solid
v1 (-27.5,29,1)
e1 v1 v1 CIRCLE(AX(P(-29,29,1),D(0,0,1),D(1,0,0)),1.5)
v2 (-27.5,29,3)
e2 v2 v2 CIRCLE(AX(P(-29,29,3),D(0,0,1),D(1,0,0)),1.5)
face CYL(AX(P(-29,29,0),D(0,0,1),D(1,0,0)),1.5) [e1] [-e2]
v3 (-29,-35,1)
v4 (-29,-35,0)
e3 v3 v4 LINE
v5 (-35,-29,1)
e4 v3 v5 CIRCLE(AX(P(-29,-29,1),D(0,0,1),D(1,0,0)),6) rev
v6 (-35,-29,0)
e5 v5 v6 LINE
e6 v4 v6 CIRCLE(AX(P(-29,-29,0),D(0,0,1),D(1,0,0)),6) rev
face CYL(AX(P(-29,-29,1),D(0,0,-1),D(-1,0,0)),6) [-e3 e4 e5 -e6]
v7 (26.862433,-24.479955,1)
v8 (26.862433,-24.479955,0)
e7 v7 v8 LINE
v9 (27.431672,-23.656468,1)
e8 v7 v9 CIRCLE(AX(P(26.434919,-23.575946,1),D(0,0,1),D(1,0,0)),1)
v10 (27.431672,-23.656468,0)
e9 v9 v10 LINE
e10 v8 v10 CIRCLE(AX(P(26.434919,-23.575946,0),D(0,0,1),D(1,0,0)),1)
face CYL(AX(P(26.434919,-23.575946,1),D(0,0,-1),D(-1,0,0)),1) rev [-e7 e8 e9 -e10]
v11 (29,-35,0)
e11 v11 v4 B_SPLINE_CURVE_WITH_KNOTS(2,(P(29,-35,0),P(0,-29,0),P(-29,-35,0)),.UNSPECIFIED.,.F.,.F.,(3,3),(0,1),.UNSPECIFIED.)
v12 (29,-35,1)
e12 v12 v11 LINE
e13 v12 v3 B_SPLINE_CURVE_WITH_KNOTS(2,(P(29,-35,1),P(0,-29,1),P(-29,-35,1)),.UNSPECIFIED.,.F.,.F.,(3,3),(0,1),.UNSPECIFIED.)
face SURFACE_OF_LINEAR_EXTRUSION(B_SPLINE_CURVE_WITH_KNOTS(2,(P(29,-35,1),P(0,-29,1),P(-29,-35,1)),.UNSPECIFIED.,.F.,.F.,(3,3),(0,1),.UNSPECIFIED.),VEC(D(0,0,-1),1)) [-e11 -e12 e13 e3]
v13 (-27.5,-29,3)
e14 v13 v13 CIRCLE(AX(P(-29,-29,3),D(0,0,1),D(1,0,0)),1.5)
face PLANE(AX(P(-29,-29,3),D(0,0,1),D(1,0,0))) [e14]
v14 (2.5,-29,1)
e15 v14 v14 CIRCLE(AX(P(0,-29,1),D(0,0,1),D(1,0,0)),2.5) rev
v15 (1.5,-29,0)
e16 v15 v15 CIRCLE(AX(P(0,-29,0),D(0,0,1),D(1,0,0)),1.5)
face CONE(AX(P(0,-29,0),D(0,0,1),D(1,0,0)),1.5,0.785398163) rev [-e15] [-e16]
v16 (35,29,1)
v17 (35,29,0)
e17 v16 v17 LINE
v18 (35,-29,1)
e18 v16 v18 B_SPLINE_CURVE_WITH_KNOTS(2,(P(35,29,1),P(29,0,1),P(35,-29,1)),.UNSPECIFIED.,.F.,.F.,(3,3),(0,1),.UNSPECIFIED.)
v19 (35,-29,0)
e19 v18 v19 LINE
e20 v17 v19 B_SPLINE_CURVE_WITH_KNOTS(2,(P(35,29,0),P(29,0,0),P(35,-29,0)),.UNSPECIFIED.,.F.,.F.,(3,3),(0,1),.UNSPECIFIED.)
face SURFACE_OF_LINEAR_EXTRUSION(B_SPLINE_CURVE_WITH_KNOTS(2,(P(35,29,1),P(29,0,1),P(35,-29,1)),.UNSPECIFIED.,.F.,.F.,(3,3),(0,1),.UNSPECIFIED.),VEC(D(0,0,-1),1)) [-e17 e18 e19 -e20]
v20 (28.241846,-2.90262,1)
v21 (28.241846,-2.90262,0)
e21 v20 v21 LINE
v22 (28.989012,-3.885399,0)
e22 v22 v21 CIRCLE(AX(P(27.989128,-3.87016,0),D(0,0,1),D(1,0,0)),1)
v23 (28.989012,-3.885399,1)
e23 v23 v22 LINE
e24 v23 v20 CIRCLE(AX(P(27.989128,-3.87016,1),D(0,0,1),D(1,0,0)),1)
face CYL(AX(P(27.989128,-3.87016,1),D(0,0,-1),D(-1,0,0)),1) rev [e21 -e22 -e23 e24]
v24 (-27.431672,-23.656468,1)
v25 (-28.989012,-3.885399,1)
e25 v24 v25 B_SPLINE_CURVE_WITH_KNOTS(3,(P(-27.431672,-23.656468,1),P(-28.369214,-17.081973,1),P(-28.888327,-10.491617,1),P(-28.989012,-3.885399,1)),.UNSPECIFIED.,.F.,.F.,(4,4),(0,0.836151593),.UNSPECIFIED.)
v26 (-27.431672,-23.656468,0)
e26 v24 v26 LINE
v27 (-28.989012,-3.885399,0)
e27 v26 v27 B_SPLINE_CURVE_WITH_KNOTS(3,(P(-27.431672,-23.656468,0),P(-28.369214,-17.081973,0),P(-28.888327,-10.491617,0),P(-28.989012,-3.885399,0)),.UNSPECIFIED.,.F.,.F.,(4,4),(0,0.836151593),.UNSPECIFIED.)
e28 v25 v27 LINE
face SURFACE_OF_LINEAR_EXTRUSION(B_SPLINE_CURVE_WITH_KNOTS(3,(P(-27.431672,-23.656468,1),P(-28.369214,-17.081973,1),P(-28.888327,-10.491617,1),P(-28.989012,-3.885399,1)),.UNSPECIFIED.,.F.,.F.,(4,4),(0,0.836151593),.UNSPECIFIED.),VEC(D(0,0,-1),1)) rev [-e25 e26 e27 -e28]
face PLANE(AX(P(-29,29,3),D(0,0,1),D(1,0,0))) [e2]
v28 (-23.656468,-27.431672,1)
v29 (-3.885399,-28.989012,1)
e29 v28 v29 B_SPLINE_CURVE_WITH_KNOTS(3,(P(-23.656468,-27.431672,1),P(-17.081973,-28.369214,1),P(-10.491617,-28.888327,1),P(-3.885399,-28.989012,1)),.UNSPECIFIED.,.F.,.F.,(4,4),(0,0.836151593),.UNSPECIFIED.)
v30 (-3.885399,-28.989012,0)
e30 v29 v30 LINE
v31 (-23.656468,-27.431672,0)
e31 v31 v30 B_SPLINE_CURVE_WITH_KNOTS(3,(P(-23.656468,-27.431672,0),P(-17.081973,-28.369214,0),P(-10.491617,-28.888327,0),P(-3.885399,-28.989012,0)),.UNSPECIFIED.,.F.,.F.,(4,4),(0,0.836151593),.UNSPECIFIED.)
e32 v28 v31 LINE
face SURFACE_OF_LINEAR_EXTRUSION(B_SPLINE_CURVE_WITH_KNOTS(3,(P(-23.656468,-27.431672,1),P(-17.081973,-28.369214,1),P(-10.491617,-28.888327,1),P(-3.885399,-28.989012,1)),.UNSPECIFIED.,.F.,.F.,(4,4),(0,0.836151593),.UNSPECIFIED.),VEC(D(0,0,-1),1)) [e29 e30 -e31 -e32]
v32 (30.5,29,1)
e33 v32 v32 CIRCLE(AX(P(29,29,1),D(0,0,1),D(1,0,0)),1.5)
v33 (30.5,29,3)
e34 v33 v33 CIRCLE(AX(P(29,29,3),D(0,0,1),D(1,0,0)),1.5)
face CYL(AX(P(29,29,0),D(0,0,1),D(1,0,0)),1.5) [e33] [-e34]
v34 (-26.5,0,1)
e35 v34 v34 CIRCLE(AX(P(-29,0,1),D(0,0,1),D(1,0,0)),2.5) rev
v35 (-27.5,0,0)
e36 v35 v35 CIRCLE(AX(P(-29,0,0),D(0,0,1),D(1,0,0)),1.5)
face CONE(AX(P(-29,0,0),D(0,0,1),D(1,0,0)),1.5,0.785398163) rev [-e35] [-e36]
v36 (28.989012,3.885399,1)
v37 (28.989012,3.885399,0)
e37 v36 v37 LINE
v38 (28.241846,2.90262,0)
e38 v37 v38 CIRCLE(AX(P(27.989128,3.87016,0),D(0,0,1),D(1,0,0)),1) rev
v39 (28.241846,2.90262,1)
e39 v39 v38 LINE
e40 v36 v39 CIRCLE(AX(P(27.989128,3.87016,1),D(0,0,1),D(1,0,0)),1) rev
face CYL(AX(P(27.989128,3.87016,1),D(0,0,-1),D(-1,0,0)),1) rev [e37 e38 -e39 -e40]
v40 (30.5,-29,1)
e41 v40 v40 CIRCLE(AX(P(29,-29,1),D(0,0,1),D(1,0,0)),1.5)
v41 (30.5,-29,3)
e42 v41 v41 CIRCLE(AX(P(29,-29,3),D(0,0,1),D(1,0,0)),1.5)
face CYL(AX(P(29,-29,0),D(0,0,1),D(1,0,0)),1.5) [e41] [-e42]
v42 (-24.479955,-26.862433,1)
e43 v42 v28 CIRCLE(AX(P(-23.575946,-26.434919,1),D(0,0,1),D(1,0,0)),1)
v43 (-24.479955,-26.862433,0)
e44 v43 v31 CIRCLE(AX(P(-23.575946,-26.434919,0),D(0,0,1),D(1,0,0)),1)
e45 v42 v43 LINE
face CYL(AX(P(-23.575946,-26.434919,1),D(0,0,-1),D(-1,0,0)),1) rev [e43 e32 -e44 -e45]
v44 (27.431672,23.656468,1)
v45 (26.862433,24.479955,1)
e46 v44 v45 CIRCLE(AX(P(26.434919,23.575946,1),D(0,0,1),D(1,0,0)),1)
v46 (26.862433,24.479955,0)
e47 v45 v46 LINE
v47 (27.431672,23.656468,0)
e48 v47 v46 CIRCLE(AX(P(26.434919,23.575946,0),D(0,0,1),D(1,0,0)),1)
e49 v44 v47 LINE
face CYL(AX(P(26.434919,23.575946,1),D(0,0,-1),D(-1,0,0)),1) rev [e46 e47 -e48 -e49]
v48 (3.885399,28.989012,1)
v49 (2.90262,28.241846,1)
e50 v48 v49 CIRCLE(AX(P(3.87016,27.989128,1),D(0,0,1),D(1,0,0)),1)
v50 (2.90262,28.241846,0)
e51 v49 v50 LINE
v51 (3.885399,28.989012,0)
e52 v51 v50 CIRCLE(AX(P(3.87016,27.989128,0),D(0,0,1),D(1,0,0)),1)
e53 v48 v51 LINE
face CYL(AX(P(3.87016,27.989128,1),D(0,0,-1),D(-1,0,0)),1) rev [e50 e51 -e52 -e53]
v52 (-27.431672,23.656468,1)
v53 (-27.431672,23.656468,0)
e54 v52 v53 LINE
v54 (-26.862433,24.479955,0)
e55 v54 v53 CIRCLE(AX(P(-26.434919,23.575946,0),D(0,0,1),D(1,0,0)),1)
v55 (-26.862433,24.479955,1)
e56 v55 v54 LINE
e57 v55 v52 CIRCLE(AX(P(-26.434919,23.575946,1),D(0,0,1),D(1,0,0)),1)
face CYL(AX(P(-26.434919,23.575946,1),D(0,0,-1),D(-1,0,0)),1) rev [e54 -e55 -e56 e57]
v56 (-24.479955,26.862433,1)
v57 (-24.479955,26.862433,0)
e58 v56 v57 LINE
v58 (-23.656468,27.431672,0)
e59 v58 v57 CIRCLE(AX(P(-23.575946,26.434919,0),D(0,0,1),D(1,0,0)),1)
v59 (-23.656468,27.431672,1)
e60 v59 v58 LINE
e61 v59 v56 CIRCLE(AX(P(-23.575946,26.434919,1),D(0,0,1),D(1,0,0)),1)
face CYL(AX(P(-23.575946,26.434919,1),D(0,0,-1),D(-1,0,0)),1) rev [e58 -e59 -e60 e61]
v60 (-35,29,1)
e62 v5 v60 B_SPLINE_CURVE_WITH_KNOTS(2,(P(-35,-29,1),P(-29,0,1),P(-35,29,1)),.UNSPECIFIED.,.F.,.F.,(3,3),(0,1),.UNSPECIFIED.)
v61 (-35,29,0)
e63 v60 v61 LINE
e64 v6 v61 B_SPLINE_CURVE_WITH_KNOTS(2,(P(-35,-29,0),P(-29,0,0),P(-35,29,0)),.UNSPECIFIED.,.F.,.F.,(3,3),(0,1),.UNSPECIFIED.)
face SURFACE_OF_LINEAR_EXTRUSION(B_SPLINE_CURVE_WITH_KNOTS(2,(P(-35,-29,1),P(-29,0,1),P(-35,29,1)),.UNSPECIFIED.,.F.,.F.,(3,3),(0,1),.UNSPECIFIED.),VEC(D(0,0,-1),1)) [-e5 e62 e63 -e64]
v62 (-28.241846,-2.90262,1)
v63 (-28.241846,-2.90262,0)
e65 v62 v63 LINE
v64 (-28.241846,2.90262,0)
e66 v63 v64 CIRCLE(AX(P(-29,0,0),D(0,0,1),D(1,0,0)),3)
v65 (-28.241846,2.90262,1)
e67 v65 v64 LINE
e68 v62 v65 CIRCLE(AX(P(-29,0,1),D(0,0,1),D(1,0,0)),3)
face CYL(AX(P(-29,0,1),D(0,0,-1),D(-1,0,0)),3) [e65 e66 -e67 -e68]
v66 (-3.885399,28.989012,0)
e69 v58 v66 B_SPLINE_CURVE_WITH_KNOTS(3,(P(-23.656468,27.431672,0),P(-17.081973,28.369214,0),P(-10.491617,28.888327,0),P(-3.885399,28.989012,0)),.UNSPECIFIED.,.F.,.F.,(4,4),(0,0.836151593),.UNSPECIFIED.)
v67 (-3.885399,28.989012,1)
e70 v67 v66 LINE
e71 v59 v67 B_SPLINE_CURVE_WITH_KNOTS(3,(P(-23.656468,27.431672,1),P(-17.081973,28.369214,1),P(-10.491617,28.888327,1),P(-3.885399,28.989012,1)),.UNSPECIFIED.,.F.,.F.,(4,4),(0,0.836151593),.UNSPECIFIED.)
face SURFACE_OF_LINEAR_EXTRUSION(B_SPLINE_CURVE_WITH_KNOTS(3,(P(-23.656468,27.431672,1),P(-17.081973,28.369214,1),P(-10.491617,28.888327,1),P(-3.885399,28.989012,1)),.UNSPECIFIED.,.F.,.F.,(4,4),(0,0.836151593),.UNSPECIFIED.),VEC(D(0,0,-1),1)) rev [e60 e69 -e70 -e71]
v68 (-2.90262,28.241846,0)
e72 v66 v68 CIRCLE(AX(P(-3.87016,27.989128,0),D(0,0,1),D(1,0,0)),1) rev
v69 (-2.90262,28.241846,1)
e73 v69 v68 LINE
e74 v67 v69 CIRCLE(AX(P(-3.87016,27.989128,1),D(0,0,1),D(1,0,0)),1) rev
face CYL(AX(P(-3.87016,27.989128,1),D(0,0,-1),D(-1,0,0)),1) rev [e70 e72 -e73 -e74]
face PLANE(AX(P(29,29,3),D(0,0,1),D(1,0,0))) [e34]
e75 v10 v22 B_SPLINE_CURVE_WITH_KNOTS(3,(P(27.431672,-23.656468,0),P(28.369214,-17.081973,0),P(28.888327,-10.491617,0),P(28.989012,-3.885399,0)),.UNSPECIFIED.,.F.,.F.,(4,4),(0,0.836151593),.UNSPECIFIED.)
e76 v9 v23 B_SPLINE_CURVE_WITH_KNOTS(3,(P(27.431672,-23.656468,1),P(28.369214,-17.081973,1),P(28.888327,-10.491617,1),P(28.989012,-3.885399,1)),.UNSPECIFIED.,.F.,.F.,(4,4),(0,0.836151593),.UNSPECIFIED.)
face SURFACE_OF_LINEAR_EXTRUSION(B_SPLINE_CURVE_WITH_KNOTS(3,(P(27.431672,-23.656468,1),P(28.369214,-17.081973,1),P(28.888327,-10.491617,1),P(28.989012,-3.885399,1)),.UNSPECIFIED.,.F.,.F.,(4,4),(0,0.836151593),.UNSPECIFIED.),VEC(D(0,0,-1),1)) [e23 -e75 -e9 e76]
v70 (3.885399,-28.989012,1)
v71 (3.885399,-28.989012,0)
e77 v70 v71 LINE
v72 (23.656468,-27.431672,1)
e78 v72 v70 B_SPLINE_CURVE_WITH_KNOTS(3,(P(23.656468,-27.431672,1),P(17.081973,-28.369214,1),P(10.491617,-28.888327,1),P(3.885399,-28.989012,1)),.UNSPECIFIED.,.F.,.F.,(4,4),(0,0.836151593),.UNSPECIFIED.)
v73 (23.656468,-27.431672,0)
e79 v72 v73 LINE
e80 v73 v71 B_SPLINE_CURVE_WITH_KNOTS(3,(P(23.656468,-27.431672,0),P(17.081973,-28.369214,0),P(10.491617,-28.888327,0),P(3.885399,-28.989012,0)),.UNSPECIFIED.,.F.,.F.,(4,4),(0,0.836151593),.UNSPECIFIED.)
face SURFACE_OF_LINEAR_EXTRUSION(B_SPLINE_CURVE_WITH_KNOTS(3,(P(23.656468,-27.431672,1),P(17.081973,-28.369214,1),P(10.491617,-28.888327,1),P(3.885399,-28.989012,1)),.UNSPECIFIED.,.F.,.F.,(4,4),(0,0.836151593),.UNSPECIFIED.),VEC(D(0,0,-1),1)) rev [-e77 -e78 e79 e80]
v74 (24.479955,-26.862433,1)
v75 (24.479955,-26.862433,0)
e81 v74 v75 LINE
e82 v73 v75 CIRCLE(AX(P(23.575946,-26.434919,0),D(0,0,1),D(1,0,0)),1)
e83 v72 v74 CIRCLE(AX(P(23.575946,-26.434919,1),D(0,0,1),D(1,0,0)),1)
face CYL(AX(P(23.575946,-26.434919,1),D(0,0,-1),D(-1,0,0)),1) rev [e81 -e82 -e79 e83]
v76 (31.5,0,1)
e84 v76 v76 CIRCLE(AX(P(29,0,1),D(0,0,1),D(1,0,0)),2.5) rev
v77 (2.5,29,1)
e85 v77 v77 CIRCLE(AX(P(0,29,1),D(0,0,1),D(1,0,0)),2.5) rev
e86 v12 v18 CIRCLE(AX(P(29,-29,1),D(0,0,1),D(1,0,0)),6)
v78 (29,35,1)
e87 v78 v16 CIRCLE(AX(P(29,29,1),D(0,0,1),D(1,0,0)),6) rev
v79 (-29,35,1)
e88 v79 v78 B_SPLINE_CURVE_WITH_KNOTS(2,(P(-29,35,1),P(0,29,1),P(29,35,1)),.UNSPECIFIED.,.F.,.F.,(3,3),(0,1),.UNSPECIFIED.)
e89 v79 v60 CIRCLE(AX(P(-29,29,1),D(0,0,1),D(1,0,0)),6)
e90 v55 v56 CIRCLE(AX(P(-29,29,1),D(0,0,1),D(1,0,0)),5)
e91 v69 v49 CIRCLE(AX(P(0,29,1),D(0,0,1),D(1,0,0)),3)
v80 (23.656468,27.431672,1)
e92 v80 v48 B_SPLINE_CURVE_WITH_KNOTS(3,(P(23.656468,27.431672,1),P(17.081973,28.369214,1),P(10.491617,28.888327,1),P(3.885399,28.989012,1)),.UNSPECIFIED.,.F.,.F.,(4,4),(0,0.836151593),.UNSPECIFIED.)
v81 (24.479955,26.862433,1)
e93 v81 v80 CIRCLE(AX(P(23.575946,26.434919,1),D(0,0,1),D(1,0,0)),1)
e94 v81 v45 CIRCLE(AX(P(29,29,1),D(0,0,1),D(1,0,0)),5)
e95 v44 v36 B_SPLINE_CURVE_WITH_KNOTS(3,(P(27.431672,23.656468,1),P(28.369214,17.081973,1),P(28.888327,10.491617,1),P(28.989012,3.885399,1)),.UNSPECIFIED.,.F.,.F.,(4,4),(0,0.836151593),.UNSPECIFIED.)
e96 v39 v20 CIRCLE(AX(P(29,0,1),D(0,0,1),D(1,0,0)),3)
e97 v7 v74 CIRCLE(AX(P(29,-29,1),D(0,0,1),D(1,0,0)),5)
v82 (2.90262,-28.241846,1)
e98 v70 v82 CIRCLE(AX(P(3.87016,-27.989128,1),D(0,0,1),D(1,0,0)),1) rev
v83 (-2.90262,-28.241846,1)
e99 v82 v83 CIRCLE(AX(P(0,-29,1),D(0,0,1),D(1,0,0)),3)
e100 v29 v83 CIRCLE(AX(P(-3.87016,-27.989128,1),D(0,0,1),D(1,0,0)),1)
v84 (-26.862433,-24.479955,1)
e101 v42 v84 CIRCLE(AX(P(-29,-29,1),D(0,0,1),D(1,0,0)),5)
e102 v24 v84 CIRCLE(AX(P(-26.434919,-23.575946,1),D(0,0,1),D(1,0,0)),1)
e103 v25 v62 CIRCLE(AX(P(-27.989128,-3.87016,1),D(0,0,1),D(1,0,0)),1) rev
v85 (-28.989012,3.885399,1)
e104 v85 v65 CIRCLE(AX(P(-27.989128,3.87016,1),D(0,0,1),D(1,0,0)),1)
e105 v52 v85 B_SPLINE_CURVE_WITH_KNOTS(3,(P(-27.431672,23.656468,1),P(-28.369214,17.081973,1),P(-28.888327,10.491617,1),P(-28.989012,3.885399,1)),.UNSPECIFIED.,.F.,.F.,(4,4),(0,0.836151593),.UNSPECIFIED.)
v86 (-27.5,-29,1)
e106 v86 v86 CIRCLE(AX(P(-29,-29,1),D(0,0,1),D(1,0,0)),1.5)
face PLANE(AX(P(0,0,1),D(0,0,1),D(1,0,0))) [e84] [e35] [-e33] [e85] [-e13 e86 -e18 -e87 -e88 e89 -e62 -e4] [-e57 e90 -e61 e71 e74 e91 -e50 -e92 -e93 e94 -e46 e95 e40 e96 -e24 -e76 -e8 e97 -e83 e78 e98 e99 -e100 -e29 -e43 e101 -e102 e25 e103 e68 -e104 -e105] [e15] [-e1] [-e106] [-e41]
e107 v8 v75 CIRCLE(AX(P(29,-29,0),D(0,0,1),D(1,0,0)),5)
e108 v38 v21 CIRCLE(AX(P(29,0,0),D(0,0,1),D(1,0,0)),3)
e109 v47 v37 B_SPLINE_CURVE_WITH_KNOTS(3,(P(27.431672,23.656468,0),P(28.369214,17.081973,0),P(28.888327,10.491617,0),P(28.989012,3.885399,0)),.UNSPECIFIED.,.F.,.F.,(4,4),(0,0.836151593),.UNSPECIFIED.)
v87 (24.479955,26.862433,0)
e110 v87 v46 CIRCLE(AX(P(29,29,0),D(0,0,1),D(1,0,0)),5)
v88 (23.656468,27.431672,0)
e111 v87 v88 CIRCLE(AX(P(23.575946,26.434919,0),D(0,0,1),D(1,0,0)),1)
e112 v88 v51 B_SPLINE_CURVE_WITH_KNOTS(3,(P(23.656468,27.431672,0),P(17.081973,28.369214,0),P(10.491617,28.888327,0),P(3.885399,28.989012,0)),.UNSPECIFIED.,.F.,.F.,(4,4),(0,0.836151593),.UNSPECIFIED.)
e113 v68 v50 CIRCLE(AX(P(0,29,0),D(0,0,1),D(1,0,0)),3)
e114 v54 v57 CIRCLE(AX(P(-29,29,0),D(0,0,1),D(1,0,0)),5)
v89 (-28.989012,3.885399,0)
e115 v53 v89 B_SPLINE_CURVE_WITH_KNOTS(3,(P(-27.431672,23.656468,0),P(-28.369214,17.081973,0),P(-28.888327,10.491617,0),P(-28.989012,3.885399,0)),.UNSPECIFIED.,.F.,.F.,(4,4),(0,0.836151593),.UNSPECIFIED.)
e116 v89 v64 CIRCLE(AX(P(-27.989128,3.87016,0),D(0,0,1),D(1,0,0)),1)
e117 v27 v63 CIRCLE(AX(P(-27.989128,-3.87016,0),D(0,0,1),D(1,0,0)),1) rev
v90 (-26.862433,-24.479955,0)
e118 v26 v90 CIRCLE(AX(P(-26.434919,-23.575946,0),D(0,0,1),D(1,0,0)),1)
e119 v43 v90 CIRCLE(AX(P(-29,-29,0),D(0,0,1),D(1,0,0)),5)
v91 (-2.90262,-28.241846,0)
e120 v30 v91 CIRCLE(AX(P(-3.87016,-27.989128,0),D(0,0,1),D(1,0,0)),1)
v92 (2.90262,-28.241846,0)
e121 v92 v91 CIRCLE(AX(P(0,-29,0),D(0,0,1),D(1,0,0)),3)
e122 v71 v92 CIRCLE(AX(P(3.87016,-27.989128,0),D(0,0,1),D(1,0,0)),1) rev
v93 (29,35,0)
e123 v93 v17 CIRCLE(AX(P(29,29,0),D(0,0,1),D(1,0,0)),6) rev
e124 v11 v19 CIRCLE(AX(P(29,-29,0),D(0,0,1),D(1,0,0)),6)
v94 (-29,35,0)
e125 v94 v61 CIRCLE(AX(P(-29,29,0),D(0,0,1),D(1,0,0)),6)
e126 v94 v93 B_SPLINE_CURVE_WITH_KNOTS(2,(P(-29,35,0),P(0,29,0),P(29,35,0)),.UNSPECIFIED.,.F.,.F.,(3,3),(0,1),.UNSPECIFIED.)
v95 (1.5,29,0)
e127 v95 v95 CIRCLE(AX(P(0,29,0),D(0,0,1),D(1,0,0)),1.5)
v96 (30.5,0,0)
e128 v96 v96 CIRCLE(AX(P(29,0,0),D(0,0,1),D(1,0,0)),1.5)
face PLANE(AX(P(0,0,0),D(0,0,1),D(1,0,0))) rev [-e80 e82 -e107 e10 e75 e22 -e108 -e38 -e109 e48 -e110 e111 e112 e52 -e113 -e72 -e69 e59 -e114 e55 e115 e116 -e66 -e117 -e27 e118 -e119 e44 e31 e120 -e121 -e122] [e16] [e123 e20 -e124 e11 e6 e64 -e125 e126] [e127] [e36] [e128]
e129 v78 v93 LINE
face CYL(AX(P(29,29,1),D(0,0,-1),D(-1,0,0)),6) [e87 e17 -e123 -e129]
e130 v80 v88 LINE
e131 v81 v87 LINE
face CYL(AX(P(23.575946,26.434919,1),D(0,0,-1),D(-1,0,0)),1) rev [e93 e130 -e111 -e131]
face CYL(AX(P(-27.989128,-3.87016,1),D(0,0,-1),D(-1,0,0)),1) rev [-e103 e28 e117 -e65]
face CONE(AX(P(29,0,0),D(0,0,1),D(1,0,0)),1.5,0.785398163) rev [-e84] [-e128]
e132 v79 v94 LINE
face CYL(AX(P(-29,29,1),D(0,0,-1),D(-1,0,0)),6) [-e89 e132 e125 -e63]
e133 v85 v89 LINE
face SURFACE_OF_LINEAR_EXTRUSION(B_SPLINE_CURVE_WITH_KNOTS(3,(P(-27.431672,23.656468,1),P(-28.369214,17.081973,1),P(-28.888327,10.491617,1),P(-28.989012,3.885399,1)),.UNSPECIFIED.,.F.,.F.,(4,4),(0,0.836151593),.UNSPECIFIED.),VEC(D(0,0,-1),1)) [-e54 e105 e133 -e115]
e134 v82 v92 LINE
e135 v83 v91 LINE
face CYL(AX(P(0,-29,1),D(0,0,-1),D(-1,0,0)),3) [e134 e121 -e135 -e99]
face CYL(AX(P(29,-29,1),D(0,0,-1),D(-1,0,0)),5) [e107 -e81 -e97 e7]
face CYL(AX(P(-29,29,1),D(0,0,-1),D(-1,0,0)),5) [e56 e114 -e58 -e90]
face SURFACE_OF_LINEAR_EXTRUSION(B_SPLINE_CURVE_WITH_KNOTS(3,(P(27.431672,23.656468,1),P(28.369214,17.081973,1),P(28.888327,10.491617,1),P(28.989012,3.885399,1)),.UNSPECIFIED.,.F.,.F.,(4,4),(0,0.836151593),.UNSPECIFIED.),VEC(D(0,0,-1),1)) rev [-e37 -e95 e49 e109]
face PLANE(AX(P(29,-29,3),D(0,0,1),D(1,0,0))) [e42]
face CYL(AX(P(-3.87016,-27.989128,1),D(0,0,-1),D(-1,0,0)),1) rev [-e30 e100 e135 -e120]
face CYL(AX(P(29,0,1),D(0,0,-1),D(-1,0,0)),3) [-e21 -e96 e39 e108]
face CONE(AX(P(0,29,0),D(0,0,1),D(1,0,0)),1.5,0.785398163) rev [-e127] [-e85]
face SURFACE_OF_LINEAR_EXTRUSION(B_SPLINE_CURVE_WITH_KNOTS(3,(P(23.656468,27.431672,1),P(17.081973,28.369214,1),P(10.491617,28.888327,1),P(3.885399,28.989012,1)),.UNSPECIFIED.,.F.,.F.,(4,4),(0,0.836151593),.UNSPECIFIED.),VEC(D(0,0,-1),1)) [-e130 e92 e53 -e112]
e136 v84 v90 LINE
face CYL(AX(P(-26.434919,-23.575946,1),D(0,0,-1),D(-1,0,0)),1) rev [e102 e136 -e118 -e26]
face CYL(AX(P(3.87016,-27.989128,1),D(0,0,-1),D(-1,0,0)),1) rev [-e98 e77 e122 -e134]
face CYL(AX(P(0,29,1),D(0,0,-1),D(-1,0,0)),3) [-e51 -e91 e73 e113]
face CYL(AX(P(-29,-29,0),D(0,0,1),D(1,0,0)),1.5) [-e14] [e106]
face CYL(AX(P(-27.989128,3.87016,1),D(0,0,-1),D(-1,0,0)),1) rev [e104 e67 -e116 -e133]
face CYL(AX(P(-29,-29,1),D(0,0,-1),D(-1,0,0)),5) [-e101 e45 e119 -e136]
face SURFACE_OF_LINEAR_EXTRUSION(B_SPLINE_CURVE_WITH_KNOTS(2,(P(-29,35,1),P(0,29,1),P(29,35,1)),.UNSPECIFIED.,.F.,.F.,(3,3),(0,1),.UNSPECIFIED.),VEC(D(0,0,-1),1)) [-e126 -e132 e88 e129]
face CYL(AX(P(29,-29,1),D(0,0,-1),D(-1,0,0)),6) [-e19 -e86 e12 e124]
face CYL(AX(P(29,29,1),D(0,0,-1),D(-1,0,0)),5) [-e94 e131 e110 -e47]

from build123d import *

# Parameters (mm, degrees)
IZIM3_R                          = 1.5
Y_KSEKLIK_EKSTR_ZYON3_DEPTH      = 1
PAH1_SIZE                        = 1
Y_KSEKLIK_EKSTR_ZYON5_DEPTH      = 2
Y_KSEKLIK_EKSTR_ZYON5_DEPTH_BACK = 1
IZIM5_R                          = 1.5
Y_KSEKLIK_EKSTR_ZYON4_DEPTH      = 2
Y_KSEKLIK_EKSTR_ZYON4_DEPTH_BACK = 1
IZIM4_R                          = 1.5


with BuildPart() as part:
    # Çizim3 → Yükseklik-Ekstrüzyon3 (new body)
    with BuildSketch(Plane.XY):
        with BuildLine():
            ThreePointArc((-29, 35), (-33.242640687, 33.242640687), (-35, 29))
            add(Edge.make_bspline(
                [(-35, -29), (-29, 0), (-35, 29)],
                knots=[0, 0, 0, 1, 1, 1], degree=2))
            ThreePointArc((-35, -29), (-33.242640687, -33.242640687), (-29, -35))
            add(Edge.make_bspline(
                [(29, -35), (0, -29), (-29, -35)],
                knots=[0, 0, 0, 1, 1, 1], degree=2))
            ThreePointArc((29, -35), (33.242640687, -33.242640687), (35, -29))
            add(Edge.make_bspline(
                [(35, 29), (29, 0), (35, -29)],
                knots=[0, 0, 0, 1, 1, 1], degree=2))
            ThreePointArc((35, 29), (33.242640687, 33.242640687), (29, 35))
            add(Edge.make_bspline(
                [(-29, 35), (0, 29), (29, 35)],
                knots=[0, 0, 0, 1, 1, 1], degree=2))
        make_face()
        with Locations((0, -29)):
            Circle(IZIM3_R, mode=Mode.SUBTRACT)
        with Locations((-29, 0)):
            Circle(IZIM3_R, mode=Mode.SUBTRACT)
        with Locations((-29, 29)):
            Circle(IZIM3_R, mode=Mode.SUBTRACT)
        with Locations((29, 29)):
            Circle(IZIM3_R, mode=Mode.SUBTRACT)
        with Locations((-29, -29)):
            Circle(IZIM3_R, mode=Mode.SUBTRACT)
        with Locations((29, -29)):
            Circle(IZIM3_R, mode=Mode.SUBTRACT)
        with Locations((0, 29)):
            Circle(IZIM3_R, mode=Mode.SUBTRACT)
        with Locations((29, 0)):
            Circle(IZIM3_R, mode=Mode.SUBTRACT)
        with BuildLine():
            ThreePointArc((-24.479955031, -26.862432812), (-25.464466094, -25.464466094), (-26.862432812, -24.479955031))
            ThreePointArc((-26.862432812, -24.479955031), (-27.257516743, -24.144570316), (-27.431672227, -23.65646778))
            add(Edge.make_bspline(
                [(-27.431672227, -23.65646778), (-28.369214102, -17.081973168), (-28.888327363, -10.491616934), (-28.989012012, -3.885399076)],
                knots=[0, 0, 0, 0, 0.836151593, 0.836151593, 0.836151593, 0.836151593], degree=3))
            ThreePointArc((-28.989012012, -3.885399076), (-28.785191285, -3.264946388), (-28.241846101, -2.902619966))
            ThreePointArc((-28.241846101, -2.902619966), (-26, 0), (-28.241846101, 2.902619966))
            ThreePointArc((-28.241846101, 2.902619966), (-28.785191285, 3.264946388), (-28.989012012, 3.885399076))
            add(Edge.make_bspline(
                [(-27.431672227, 23.65646778), (-28.369214102, 17.081973168), (-28.888327363, 10.491616934), (-28.989012012, 3.885399076)],
                knots=[0, 0, 0, 0, 0.836151593, 0.836151593, 0.836151593, 0.836151593], degree=3))
            ThreePointArc((-27.431672227, 23.65646778), (-27.257516743, 24.144570316), (-26.862432812, 24.479955031))
            ThreePointArc((-26.862432812, 24.479955031), (-25.464466094, 25.464466094), (-24.479955031, 26.862432812))
            ThreePointArc((-24.479955031, 26.862432812), (-24.144570316, 27.257516743), (-23.65646778, 27.431672227))
            add(Edge.make_bspline(
                [(-23.65646778, 27.431672227), (-17.081973168, 28.369214102), (-10.491616934, 28.888327363), (-3.885399076, 28.989012012)],
                knots=[0, 0, 0, 0, 0.836151593, 0.836151593, 0.836151593, 0.836151593], degree=3))
            ThreePointArc((-3.885399076, 28.989012012), (-3.264946388, 28.785191285), (-2.902619966, 28.241846101))
            ThreePointArc((-2.902619966, 28.241846101), (0, 26), (2.902619966, 28.241846101))
            ThreePointArc((2.902619966, 28.241846101), (3.264946388, 28.785191285), (3.885399076, 28.989012012))
            add(Edge.make_bspline(
                [(23.65646778, 27.431672227), (17.081973168, 28.369214102), (10.491616934, 28.888327363), (3.885399076, 28.989012012)],
                knots=[0, 0, 0, 0, 0.836151593, 0.836151593, 0.836151593, 0.836151593], degree=3))
            ThreePointArc((23.65646778, 27.431672227), (24.144570316, 27.257516743), (24.479955031, 26.862432812))
            ThreePointArc((24.479955031, 26.862432812), (25.464466094, 25.464466094), (26.862432812, 24.479955031))
            ThreePointArc((26.862432812, 24.479955031), (27.257516743, 24.144570316), (27.431672227, 23.65646778))
            add(Edge.make_bspline(
                [(27.431672227, 23.65646778), (28.369214102, 17.081973168), (28.888327363, 10.491616934), (28.989012012, 3.885399076)],
                knots=[0, 0, 0, 0, 0.836151593, 0.836151593, 0.836151593, 0.836151593], degree=3))
            ThreePointArc((28.989012012, 3.885399076), (28.785191285, 3.264946389), (28.241846101, 2.902619966))
            ThreePointArc((28.241846101, 2.902619966), (26, 0), (28.241846101, -2.902619966))
            ThreePointArc((28.241846101, -2.902619966), (28.785191285, -3.264946388), (28.989012012, -3.885399076))
            add(Edge.make_bspline(
                [(27.431672227, -23.65646778), (28.369214102, -17.081973168), (28.888327363, -10.491616934), (28.989012012, -3.885399076)],
                knots=[0, 0, 0, 0, 0.836151593, 0.836151593, 0.836151593, 0.836151593], degree=3))
            ThreePointArc((27.431672227, -23.65646778), (27.257516743, -24.144570316), (26.862432812, -24.479955031))
            ThreePointArc((26.862432812, -24.479955031), (25.464466094, -25.464466094), (24.479955031, -26.862432812))
            ThreePointArc((24.479955031, -26.862432812), (24.144570316, -27.257516743), (23.65646778, -27.431672227))
            add(Edge.make_bspline(
                [(23.65646778, -27.431672227), (17.081973168, -28.369214102), (10.491616934, -28.888327363), (3.885399076, -28.989012012)],
                knots=[0, 0, 0, 0, 0.836151593, 0.836151593, 0.836151593, 0.836151593], degree=3))
            ThreePointArc((3.885399076, -28.989012012), (3.264946388, -28.785191285), (2.902619966, -28.241846101))
            ThreePointArc((2.902619966, -28.241846101), (0, -26), (-2.902619966, -28.241846101))
            ThreePointArc((-2.902619966, -28.241846101), (-3.264946388, -28.785191285), (-3.885399076, -28.989012012))
            add(Edge.make_bspline(
                [(-23.65646778, -27.431672227), (-17.081973168, -28.369214102), (-10.491616934, -28.888327363), (-3.885399076, -28.989012012)],
                knots=[0, 0, 0, 0, 0.836151593, 0.836151593, 0.836151593, 0.836151593], degree=3))
            ThreePointArc((-23.65646778, -27.431672227), (-24.144570316, -27.257516743), (-24.479955031, -26.862432812))
        make_face(mode=Mode.SUBTRACT)
    extrude(amount=Y_KSEKLIK_EKSTR_ZYON3_DEPTH)

    # Pah1
    pah1_edges = [part.edges().sort_by_distance(p)[0] for p in [
        (-1.5, 29, 1),
        (27.5, 0, 1),
        (-1.5, -29, 1),
        (-30.5, 0, 1),
    ]]
    chamfer(pah1_edges, length=PAH1_SIZE - 0.0001)  # a hair under: the kernel refuses the full size

    # Çizim5 → Yükseklik-Ekstrüzyon5 (add, two sides: drawn at the far end of the back side and taken through both)
    with BuildSketch(Plane.XY.offset(1).offset(-Y_KSEKLIK_EKSTR_ZYON5_DEPTH_BACK)):
        with Locations((-29, 29)):
            Circle(IZIM5_R)
        with Locations((29, 29)):
            Circle(IZIM5_R)
        with Locations((29, -29)):
            Circle(IZIM5_R)
        with Locations((-29, -29)):
            Circle(IZIM5_R)
    extrude(amount=Y_KSEKLIK_EKSTR_ZYON5_DEPTH + Y_KSEKLIK_EKSTR_ZYON5_DEPTH_BACK)

    # Çizim4 → Yükseklik-Ekstrüzyon4 (add, two sides: drawn at the far end of the back side and taken through both)
    with BuildSketch(Plane.XY.offset(1).offset(-Y_KSEKLIK_EKSTR_ZYON4_DEPTH_BACK)):
        with Locations((-29, 29)):
            Circle(IZIM4_R)
        with Locations((29, 29)):
            Circle(IZIM4_R)
        with Locations((29, -29)):
            Circle(IZIM4_R)
        with Locations((-29, -29)):
            Circle(IZIM4_R)
    extrude(amount=Y_KSEKLIK_EKSTR_ZYON4_DEPTH + Y_KSEKLIK_EKSTR_ZYON4_DEPTH_BACK)


solid = part.part
